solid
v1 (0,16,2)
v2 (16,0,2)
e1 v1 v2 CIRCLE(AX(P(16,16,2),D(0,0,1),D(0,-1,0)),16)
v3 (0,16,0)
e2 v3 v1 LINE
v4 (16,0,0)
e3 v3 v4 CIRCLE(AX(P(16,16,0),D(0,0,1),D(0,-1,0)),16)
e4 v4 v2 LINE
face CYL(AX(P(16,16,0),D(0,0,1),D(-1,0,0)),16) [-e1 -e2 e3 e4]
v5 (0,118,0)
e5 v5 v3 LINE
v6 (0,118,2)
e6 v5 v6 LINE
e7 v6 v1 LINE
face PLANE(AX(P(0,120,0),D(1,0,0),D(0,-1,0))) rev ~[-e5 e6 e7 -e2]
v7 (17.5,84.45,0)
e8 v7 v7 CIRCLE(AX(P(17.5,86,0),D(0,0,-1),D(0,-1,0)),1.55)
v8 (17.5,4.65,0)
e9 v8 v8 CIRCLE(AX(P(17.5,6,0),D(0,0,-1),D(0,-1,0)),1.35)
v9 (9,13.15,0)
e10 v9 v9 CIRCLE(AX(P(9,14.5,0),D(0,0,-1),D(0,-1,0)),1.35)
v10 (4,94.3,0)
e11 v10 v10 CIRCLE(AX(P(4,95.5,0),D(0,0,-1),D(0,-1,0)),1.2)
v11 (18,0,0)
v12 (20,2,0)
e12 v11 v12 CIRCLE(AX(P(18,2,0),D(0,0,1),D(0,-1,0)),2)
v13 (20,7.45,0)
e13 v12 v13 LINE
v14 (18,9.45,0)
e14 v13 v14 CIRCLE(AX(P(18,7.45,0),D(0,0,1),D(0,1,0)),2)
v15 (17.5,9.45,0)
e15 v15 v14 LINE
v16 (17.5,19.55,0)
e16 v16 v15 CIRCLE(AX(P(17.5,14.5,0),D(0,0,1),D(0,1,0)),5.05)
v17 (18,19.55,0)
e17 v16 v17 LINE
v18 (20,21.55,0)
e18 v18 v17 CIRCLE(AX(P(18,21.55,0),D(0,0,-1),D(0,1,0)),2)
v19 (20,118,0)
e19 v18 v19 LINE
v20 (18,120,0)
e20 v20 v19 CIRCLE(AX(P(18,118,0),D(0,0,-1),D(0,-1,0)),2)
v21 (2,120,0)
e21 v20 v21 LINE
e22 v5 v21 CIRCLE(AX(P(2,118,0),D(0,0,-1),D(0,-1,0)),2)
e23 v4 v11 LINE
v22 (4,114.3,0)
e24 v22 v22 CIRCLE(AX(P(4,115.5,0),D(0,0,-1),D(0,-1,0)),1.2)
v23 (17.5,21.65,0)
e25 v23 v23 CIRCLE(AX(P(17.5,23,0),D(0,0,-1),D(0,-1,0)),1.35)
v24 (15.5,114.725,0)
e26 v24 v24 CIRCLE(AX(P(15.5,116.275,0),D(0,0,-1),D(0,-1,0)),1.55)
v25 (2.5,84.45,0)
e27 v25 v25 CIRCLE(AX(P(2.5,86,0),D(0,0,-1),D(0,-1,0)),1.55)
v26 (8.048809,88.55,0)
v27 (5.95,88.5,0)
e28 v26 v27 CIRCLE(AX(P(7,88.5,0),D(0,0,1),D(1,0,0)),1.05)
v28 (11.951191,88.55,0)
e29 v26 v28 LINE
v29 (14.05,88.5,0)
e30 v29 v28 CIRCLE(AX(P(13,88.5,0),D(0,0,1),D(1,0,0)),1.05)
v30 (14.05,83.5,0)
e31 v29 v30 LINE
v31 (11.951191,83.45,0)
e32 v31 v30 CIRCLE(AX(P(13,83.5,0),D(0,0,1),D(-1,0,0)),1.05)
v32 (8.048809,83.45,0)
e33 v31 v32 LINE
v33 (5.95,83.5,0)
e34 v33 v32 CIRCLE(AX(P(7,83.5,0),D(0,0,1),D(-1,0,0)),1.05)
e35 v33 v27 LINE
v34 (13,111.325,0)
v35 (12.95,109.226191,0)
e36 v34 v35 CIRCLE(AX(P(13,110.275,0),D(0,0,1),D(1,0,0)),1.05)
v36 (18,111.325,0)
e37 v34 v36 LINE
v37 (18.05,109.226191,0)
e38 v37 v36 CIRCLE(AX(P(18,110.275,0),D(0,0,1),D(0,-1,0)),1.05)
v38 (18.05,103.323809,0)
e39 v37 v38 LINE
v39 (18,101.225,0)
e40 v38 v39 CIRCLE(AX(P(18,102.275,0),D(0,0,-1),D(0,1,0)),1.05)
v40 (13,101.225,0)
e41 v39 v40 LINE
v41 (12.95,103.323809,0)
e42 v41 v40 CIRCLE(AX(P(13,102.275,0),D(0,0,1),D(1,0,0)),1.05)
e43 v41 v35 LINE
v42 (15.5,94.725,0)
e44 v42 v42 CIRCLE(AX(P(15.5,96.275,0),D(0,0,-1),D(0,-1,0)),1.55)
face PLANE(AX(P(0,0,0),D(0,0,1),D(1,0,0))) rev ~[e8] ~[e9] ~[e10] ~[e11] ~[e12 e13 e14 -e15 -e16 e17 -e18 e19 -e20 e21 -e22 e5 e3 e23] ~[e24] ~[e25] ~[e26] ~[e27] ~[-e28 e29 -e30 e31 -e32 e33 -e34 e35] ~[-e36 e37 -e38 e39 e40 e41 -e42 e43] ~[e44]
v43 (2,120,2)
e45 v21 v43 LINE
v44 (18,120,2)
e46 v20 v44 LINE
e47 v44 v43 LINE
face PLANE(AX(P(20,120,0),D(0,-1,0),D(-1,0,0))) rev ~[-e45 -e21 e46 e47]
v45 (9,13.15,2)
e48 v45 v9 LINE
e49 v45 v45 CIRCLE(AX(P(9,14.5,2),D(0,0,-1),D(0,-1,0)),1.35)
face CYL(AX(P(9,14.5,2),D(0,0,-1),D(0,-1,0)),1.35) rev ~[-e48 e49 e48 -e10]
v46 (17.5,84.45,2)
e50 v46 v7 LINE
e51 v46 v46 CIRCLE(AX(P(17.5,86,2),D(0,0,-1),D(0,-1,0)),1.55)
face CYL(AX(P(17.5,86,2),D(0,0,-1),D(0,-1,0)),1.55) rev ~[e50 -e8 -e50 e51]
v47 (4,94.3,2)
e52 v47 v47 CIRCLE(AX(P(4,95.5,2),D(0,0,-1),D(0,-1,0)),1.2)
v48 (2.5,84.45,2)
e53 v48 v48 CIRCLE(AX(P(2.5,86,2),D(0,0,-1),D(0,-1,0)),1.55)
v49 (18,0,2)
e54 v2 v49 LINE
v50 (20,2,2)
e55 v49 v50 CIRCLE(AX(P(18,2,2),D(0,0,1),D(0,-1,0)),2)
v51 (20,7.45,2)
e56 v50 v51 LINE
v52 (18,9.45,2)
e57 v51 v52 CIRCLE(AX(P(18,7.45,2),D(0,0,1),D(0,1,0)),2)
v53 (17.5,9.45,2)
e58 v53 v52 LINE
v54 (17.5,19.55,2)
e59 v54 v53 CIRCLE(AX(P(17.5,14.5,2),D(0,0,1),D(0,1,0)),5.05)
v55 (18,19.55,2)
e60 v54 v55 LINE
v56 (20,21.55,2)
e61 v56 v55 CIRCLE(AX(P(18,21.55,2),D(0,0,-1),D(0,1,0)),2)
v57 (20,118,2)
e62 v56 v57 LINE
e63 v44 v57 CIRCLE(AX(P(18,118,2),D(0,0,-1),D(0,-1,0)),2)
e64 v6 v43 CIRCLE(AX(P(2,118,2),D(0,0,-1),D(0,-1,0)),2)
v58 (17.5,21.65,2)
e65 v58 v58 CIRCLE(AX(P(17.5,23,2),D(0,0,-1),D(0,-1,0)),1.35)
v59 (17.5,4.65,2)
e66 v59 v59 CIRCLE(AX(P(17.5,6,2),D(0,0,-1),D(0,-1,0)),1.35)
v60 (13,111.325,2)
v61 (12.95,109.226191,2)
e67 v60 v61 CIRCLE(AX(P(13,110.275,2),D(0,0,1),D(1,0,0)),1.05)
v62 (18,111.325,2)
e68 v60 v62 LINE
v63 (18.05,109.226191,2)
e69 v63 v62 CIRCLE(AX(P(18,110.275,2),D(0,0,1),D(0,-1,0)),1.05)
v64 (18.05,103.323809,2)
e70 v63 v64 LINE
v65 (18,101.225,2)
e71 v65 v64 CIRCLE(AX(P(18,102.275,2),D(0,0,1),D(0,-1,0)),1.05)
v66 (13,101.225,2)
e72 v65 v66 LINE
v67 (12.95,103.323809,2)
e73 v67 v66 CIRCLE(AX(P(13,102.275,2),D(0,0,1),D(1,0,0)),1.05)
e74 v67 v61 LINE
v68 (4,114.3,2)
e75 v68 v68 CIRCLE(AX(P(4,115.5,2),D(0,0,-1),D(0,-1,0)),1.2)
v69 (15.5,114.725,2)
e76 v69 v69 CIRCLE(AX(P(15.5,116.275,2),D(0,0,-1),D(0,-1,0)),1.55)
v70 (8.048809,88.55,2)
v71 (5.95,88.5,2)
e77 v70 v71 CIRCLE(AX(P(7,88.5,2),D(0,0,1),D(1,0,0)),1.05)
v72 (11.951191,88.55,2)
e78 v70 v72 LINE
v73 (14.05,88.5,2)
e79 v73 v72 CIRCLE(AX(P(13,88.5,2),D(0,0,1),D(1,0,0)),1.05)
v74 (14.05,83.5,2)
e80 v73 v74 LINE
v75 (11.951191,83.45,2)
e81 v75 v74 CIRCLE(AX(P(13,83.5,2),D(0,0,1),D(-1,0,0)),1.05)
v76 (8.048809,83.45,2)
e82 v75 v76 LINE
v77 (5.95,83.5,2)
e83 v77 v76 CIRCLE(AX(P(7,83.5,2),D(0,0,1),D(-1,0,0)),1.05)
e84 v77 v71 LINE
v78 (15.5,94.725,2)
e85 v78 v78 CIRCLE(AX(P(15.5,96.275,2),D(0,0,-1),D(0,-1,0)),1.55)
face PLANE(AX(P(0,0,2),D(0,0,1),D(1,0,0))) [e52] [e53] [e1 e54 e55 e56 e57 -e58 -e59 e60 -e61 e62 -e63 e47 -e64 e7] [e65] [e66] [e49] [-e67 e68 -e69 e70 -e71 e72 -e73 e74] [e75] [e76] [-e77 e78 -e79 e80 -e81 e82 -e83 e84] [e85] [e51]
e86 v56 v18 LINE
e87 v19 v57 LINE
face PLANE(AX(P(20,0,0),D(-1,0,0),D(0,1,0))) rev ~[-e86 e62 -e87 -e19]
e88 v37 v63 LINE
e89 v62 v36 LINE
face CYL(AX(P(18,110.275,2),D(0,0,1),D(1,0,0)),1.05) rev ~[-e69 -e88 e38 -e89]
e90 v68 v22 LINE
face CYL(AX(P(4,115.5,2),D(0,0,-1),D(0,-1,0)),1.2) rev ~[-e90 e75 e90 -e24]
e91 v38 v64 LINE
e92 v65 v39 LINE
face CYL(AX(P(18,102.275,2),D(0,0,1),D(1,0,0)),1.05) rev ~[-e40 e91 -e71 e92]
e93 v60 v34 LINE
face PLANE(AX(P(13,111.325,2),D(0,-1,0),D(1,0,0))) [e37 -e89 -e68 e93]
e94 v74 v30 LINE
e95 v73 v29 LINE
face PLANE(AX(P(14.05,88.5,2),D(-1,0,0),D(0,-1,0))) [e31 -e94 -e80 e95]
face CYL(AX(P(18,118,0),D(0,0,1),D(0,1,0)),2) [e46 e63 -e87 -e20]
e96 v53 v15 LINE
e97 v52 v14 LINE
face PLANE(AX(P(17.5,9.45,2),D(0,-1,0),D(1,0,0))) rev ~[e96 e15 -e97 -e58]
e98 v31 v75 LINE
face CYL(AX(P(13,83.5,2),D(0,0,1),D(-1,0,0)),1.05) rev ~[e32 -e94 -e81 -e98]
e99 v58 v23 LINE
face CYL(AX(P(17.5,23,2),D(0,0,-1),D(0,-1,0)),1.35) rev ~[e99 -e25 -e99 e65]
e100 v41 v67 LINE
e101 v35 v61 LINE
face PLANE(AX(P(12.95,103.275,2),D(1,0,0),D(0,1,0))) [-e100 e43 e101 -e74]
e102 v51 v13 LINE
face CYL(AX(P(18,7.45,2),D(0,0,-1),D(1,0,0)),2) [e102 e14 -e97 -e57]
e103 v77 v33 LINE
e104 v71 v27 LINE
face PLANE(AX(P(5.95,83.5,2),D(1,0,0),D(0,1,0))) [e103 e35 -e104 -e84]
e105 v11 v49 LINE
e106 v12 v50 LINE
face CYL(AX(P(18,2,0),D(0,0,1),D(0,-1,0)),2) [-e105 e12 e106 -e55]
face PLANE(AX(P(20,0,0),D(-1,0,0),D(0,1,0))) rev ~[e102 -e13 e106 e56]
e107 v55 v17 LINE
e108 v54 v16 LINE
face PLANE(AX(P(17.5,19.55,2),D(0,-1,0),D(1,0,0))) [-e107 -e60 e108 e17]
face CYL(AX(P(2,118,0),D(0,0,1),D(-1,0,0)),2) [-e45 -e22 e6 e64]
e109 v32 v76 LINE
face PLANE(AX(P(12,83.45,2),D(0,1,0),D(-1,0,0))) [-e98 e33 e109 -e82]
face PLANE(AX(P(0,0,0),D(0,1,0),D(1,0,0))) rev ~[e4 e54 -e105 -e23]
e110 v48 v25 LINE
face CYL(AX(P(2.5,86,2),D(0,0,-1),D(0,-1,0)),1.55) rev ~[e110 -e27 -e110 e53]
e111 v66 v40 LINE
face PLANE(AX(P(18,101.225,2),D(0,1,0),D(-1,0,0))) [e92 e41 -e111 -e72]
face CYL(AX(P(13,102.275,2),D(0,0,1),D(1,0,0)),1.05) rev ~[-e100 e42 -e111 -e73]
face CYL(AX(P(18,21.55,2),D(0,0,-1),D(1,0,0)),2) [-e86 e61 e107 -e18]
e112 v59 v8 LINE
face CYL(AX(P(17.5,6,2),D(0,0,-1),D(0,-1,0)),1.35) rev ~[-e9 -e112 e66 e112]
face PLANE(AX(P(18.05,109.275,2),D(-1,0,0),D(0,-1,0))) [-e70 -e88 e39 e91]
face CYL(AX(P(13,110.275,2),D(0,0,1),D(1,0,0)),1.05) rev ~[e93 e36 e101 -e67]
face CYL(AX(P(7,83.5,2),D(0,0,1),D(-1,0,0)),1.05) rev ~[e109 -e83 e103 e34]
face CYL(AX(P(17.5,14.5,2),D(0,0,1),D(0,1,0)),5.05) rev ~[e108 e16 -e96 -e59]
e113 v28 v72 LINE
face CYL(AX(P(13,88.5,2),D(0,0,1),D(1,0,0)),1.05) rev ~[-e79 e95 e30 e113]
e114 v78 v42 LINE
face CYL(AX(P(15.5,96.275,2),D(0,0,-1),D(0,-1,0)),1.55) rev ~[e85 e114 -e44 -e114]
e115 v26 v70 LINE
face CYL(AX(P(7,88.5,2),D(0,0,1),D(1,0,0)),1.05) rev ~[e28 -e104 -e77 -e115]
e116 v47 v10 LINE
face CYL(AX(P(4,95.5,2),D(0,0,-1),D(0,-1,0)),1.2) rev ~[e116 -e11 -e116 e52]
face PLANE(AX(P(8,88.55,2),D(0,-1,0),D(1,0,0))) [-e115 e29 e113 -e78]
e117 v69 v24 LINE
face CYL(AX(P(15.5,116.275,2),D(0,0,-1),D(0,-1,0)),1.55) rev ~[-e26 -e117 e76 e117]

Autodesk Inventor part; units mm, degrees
ref_plane "YZ Plane" through (0, 0, 0) normal (1, 0, 0) x (0, 1, 0)
ref_plane "XZ Plane" through (0, 0, 0) normal (0, 1, 0) x (-1, 0, 0)
ref_plane "XY Plane" through (0, 0, 0) normal (0, 0, 1) x (1, 0, 0)
sketch "スケッチ1" plane through (0, 0, 0) normal (0, 0, 1) x (1, 0, 0)
  line L0 (0, 0) -> (20, 0)
  line L1 (20, 0) -> (20, 120)
  line L2 (20, 120) -> (0, 120)
  line L3 (0, 120) -> (0, 0)
  dimension "d0" = 120
  dimension "d1" = 20
extrude "押し出し1" add sketch "スケッチ1" along normal blind 2
sketch "スケッチ2" plane through (0, 0, 2) normal (0, 0, 1) x (1, 0, 0)
  line L0 (0, 0) -> (20, 0) projected
  line L1 (17.5, 0) -> (17.5, 120.1891) construction
  line L2 (20, 0) -> (20, 120) projected
  arc A0 (17.5, 19.55) -> (17.5, 9.45) centre (17.5, 14.5) ccw
  line L3 (17.5, 19.55) -> (20, 19.55)
  line L4 (17.5, 9.45) -> (20, 9.45)
  dimension "d4" = 2.5
  dimension "d5" = 14.5
  dimension "d6" = 10.1
extrude "押し出し2" cut sketch "スケッチ2" against normal up to surface (2 mm away)
sketch "スケッチ3" plane through (0, 0, 2) normal (0, 0, 1) x (1, 0, 0)
  arc A0 (17.5, 19.55) -> (17.5, 9.45) centre (17.5, 14.5) ccw projected
  circle A1 centre (17.5, 14.5) radius 8.5 construction
  point P0 (0, 0)
  point P1 (9, 14.5)
  point P2 (17.5, 23)
  point P3 (17.5, 6)
  dimension "d9" = 17
hole "穴1" at (9, 14.5, 2) at (17.5, 23, 2) at (17.5, 6, 2) direction (0, 0, -1) diameter 2.7 end through all
sketch "スケッチ4" plane through (0, 0, 2) normal (0, 0, 1) x (1, 0, 0)
  line L0 (20, 120) -> (0, 120) projected
  line L1 (4, 120) -> (4, 0) construction
  line L2 (0, 120) -> (0, 0) projected
  point P0 (4, 115.5)
  point P1 (4, 95.5)
  dimension "d17" = 4
  dimension "d18" = 4.5
  dimension "d19" = 20
hole "穴2" at (4, 115.5, 2) at (4, 95.5, 2) direction (0, 0, -1) diameter 2.4 end through all
sketch "スケッチ5" plane through (0, 0, 2) normal (0, 0, 1) x (1, 0, 0)
  line L0 (13, 111.275) -> (18, 111.275)
  line L1 (18, 111.275) -> (18, 101.275)
  line L2 (18, 101.275) -> (13, 101.275)
  line L3 (13, 101.275) -> (13, 111.275)
  line L4 (20, 19.55) -> (20, 120) projected
  circle A0 centre (18, 110.275) radius 1
  circle A1 centre (13, 110.275) radius 1
  circle A2 centre (13, 102.275) radius 1
  circle A3 centre (18, 102.275) radius 1
  point P0 (0, 0)
  dimension "d27" = 5
  dimension "d28" = 10
  dimension "d29" = 2
  dimension "d30" = 2
  dimension "d31" = 2
  dimension "d32" = 2
  dimension "d33" = 2
extrude "押し出し3" cut sketch "スケッチ5" against normal up to surface (2 mm away)
sketch "スケッチ6" plane through (0, 0, 2) normal (0, 0, 1) x (1, 0, 0)
  line L0 (15.5, 119.9651) -> (15.5, 0) construction
  line L1 (0, 0) -> (20, 0) projected
  line L2 (18, 109.275) -> (18, 103.275) projected
  line L3 (18, 106.275) -> (13, 106.275) construction
  line L4 (13, 103.275) -> (13, 109.275) projected
  point P0 (15.5, 116.275)
  point P1 (15.5, 96.275)
  dimension "d37" = 2.5
  dimension "d38" = 20
hole "穴3" at (15.5, 116.275, 2) at (15.5, 96.275, 2) direction (0, 0, -1) diameter 3.1 end through all
sketch "スケッチ7" plane through (0, 0, 2) normal (0, 0, 1) x (1, 0, 0)
  line L0 (20, 120) -> (0, 120) projected
  line L1 (10, 120) -> (10, 0) construction
  line L2 (0, 0) -> (20, 0) projected
  line L3 (8, 88.5) -> (12, 88.5)
  line L4 (14, 88.5) -> (14, 83.5)
  line L5 (12, 83.5) -> (8, 83.5)
  line L6 (6, 83.5) -> (6, 88.5)
  arc A0 (8, 88.5) -> (6, 88.5) centre (7, 88.5) ccw
  line L7 (6, 86) -> (14, 86) construction
  arc A1 (6, 83.5) -> (8, 83.5) centre (7, 83.5) ccw
  arc A2 (14, 88.5) -> (12, 88.5) centre (13, 88.5) ccw
  arc A3 (12, 83.5) -> (14, 83.5) centre (13, 83.5) ccw
  dimension "d48" = 8
  dimension "d49" = 5
  dimension "d50" = 2
  dimension "d64" = 34
extrude "押し出し5" cut sketch "スケッチ7" against normal through all
sketch "スケッチ9" plane through (0, 0, 2) normal (0, 0, 1) x (1, 0, 0)
  line L0 (0, 86) -> (19.9715, 86) construction
  line L1 (8, 88.5) -> (12, 88.5) projected
  line L2 (10, 88.5) -> (10, 71.9666) construction
  point P0 (0, 0)
  point P1 (2.5, 86)
  point P2 (17.5, 86)
  dimension "d55" = 2.5
  dimension "d56" = 15
hole "穴4" at (2.5, 86, 2) at (17.5, 86, 2) direction (0, 0, -1) diameter 3.1 end through all
fillet "フィレット3" radius 2 5 edges at (20, 0, 1) (20, 9.45, 1) (20, 19.55, 1) (20, 120, 1) (0, 120, 1)
fillet "フィレット4" radius 16 1 edges at (0, 0, 1)
thicken "厚み1" operation cut thickness 0.05 both sides no extend neighbours no toward (-1, 0, 0) faces at (6, 86.8333, 1.3333) (7.7994, 89.1007, 0.6667) (10.6667, 88.5, 0.6667) (12.1548, 89.0345, 0.6667) (6.2006, 82.8993, 0.6667) (9.3333, 83.5, 1.3333) (12.08, 83.108, 0.6667) (14, 85.1667, 1.3333)
thicken "厚み2" operation cut thickness 0.05 both sides no extend neighbours no toward (1, 0, 0) faces at (18, 107.275, 1.3333) (18.866, 110.775, 0.6667) (18.9035, 101.8464, 1.3333) (16.3333, 101.275, 1.3333) (12.0008, 102.2348, 0.6667) (13, 105.275, 1.3333) (12.134, 109.775, 0.6667) (14.6667, 111.275, 1.3333)
equation "\"d37\" = 0.5 * d27"
equation "\"d55\" = 0.5 * d49"
properties material "アルミニウム 2014-T4"
